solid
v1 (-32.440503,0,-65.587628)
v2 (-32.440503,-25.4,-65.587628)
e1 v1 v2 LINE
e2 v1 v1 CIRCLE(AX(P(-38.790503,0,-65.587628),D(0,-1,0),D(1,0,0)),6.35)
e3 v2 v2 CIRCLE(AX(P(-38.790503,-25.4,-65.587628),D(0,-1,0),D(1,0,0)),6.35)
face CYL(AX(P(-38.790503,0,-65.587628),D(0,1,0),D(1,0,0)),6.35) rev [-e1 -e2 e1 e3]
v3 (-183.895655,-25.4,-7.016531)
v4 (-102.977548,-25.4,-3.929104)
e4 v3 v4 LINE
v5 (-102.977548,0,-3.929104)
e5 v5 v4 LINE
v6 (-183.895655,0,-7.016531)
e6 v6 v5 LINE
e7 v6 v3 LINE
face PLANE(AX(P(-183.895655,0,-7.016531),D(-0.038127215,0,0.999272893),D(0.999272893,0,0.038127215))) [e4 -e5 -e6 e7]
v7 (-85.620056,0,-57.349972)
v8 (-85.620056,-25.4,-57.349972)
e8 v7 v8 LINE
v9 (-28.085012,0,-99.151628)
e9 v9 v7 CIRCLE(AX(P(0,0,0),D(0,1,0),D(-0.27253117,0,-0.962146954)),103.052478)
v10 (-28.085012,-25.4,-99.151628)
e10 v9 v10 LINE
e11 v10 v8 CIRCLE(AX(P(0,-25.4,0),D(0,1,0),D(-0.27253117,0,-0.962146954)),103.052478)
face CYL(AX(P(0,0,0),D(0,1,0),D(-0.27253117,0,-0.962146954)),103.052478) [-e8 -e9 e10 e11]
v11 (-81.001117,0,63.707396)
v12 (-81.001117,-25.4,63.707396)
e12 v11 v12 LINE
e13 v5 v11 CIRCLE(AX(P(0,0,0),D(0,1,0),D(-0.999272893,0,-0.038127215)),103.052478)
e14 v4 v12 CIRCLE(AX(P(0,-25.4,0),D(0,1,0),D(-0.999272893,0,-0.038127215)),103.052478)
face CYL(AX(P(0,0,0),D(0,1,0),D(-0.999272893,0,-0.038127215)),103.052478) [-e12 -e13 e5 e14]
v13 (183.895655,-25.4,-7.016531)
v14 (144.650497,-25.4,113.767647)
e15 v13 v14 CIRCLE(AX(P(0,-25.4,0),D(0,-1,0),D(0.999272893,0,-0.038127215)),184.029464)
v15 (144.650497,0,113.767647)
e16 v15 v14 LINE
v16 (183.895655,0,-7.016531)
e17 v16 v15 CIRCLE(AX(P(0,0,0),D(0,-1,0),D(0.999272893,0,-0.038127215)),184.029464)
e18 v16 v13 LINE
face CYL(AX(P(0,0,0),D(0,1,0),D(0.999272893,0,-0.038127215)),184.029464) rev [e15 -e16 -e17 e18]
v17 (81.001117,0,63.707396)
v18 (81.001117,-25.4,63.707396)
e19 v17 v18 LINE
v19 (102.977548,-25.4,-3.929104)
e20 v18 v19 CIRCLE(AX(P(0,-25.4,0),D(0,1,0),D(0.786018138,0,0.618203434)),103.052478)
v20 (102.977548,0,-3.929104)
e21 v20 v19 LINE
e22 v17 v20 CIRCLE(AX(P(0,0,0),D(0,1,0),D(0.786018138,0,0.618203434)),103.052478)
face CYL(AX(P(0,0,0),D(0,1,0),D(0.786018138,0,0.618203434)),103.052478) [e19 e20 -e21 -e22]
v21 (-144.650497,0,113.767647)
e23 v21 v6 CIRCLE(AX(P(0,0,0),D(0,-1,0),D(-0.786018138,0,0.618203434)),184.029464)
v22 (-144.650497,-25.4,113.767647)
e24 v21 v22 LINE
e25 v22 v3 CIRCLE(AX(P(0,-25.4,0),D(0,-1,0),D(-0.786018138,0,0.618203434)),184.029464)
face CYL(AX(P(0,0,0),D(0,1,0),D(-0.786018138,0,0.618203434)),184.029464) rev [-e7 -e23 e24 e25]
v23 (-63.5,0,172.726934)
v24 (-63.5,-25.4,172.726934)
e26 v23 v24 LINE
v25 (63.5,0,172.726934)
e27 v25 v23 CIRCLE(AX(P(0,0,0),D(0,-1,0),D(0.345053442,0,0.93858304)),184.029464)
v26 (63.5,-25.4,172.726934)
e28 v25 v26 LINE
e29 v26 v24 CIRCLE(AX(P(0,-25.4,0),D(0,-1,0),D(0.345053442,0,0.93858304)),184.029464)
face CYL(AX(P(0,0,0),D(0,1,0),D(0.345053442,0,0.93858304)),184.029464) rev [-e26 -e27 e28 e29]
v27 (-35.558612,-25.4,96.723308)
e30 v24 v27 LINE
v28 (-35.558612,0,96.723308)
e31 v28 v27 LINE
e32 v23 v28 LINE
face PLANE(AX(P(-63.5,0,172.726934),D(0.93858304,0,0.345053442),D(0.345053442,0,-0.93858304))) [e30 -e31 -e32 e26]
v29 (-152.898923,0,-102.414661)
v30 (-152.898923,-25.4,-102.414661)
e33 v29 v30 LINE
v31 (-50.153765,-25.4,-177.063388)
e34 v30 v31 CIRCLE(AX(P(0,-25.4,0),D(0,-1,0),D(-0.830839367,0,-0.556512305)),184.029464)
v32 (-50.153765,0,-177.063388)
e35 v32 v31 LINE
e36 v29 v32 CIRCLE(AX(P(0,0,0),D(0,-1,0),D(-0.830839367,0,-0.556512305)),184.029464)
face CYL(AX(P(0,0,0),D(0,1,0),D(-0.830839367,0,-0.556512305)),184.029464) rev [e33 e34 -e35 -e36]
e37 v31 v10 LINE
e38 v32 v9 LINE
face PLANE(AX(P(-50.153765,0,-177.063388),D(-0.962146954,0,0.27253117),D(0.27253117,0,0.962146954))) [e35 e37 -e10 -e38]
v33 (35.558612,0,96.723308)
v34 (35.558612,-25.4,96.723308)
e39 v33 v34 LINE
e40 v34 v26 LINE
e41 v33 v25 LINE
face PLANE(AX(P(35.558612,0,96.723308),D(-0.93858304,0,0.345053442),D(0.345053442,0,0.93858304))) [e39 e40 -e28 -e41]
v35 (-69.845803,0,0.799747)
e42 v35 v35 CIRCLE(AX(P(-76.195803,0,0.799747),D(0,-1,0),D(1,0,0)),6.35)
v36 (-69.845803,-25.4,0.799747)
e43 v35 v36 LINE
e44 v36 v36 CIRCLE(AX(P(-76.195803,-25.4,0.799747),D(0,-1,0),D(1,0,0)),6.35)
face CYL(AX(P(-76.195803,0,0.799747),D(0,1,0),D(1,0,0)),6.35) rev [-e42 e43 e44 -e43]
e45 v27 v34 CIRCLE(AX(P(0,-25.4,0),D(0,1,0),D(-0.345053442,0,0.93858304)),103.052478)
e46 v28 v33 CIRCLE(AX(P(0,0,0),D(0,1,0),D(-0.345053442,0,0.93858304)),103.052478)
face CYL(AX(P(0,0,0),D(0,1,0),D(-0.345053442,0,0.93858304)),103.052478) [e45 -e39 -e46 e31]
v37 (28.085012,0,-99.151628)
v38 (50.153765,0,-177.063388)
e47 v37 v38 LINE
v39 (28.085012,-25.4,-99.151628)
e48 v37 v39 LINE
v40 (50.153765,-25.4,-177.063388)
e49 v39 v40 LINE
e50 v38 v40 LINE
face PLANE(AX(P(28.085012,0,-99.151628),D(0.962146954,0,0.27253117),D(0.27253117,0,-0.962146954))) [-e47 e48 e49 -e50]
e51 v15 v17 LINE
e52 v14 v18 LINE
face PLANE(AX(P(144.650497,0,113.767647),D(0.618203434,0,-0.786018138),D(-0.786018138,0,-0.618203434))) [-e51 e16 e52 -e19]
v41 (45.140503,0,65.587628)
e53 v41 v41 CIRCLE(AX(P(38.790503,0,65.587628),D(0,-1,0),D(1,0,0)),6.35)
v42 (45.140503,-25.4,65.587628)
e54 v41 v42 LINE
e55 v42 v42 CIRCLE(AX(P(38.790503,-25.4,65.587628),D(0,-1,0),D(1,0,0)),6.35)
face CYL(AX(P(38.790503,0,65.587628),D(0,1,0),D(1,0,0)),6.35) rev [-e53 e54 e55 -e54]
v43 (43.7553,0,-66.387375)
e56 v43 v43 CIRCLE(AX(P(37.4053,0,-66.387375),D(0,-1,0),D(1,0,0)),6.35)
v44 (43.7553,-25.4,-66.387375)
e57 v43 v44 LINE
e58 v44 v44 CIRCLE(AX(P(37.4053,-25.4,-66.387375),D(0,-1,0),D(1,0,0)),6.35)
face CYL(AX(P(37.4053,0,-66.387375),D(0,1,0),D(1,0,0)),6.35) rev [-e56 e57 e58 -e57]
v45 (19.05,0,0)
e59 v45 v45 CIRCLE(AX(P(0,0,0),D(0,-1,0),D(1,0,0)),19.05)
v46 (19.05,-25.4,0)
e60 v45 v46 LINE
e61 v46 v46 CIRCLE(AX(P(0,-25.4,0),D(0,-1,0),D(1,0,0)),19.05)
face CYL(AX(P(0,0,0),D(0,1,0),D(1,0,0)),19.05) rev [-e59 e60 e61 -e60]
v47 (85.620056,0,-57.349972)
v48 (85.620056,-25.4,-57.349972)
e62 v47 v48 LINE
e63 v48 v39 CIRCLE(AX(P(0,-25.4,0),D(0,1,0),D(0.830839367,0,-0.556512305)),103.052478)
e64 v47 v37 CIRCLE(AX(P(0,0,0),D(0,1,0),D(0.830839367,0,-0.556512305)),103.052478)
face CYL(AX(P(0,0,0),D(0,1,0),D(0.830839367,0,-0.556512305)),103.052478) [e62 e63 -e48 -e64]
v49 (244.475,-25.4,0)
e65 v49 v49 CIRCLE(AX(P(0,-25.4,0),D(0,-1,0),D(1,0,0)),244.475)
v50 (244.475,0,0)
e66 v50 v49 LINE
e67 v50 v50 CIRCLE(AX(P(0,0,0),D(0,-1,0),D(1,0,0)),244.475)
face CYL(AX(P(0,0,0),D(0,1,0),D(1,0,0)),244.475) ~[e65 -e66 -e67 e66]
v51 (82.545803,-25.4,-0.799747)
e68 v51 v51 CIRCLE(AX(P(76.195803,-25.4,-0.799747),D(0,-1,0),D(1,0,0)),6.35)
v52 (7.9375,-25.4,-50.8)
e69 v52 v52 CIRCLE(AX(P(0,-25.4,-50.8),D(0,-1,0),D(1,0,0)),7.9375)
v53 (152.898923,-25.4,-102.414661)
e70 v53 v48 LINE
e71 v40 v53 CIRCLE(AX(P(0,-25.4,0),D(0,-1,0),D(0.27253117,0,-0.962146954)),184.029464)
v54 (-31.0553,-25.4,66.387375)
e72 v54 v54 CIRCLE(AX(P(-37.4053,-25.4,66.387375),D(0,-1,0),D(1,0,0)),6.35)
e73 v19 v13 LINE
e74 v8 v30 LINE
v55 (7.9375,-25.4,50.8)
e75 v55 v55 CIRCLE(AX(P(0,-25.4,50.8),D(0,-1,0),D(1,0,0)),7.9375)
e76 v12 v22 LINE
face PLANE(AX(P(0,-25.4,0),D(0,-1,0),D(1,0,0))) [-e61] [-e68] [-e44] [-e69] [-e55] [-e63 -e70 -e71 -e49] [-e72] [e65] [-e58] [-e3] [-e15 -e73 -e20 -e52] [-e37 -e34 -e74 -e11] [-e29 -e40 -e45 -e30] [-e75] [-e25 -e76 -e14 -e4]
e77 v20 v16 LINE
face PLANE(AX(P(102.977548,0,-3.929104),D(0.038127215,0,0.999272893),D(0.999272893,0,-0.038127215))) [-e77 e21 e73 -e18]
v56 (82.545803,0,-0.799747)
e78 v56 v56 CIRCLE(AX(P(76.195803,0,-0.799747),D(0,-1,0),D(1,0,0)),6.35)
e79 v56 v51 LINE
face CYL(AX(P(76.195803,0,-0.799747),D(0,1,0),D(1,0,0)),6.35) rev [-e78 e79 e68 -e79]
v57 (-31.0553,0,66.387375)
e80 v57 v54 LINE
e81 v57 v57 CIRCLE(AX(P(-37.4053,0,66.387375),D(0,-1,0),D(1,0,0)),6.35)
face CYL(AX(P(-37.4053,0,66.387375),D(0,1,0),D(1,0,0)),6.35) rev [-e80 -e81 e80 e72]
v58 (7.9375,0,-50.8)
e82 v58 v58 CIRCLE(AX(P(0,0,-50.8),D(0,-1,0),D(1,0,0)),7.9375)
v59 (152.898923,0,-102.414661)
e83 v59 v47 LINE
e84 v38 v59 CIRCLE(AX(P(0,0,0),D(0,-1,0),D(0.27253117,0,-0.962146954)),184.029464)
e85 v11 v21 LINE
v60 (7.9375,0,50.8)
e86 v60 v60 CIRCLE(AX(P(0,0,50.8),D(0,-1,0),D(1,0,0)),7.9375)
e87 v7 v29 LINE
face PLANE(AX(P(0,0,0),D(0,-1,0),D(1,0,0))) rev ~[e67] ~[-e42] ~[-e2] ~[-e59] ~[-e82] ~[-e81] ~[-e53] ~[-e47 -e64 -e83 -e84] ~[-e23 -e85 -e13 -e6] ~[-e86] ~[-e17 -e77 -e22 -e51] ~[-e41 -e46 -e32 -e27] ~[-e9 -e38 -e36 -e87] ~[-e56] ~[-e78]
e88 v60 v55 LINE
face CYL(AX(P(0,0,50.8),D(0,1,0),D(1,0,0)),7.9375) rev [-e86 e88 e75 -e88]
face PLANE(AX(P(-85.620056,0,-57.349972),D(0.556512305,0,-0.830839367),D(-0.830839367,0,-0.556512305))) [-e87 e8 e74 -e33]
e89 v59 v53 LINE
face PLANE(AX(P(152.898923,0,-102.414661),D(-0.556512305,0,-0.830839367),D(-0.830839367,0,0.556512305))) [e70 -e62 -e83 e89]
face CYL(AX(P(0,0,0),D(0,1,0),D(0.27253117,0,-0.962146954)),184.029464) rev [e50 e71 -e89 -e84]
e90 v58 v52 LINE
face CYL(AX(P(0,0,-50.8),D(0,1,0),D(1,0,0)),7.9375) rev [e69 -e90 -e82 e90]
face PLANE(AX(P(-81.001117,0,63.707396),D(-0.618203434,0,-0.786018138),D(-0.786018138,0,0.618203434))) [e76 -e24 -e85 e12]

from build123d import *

# Parameters (mm, degrees)
F0_R            = 244.475
F0_R_2          = 6.35
F0_R_3          = 7.9375
F0_R_4          = 19.05
F1_DEPTH        = 25.4
F3_DEPTH        = 25.4
F3_COPIES_COUNT = 5


# Not quite as in the source:
# - a pattern or mirror of a feature is missing from the dataset's text; its kind, count and spacing are read off the source's solid


with BuildPart() as f1:
    # F0 (on Front) → F1 (new body)
    with BuildSketch(Plane.XZ):
        Circle(F0_R)
        with Locations((-38.7905028095, -65.5876275817)):
            Circle(F0_R_2, mode=Mode.SUBTRACT)
        with Locations((37.4053002549, -66.3873746494)):
            Circle(F0_R_2, mode=Mode.SUBTRACT)
        with Locations((0, -50.8)):
            Circle(F0_R_3, mode=Mode.SUBTRACT)
        with Locations((76.1958030644, -0.7997470677)):
            Circle(F0_R_2, mode=Mode.SUBTRACT)
        with Locations((-76.1958030644, 0.7997470677)):
            Circle(F0_R_2, mode=Mode.SUBTRACT)
        with Locations((-37.4053002549, 66.3873746494)):
            Circle(F0_R_2, mode=Mode.SUBTRACT)
        Circle(F0_R_4, mode=Mode.SUBTRACT)
        with Locations((0, 50.8)):
            Circle(F0_R_3, mode=Mode.SUBTRACT)
        with Locations((38.7905028095, 65.5876275817)):
            Circle(F0_R_2, mode=Mode.SUBTRACT)
    extrude(amount=F1_DEPTH)

    # F2 (on Front) → F3 (cut, through all)
    with BuildSketch(Plane.XZ):
        with BuildLine():
            ThreePointArc((-35.5586123208, 96.7233082276), (0, 103.0524782073), (35.5586123208, 96.7233082276))
            Line((35.5586123208, 96.7233082276), (63.5, 172.7269336903))
            ThreePointArc((63.5, 172.7269336903), (0, 184.0294640053), (-63.5, 172.7269336903))
            Line((-63.5, 172.7269336903), (-35.5586123208, 96.7233082276))
        make_face()
    f3 = extrude(amount=F3_DEPTH, mode=Mode.SUBTRACT)

    # F3_copies: F3 ×5 about axis
    f3_copies_axis = Axis((0, 0, 0), (0, 1, 0))
    for i in range(1, F3_COPIES_COUNT):
        add(f3.rotate(f3_copies_axis, i * 360 / F3_COPIES_COUNT), mode=Mode.SUBTRACT)


solid = f1.part
